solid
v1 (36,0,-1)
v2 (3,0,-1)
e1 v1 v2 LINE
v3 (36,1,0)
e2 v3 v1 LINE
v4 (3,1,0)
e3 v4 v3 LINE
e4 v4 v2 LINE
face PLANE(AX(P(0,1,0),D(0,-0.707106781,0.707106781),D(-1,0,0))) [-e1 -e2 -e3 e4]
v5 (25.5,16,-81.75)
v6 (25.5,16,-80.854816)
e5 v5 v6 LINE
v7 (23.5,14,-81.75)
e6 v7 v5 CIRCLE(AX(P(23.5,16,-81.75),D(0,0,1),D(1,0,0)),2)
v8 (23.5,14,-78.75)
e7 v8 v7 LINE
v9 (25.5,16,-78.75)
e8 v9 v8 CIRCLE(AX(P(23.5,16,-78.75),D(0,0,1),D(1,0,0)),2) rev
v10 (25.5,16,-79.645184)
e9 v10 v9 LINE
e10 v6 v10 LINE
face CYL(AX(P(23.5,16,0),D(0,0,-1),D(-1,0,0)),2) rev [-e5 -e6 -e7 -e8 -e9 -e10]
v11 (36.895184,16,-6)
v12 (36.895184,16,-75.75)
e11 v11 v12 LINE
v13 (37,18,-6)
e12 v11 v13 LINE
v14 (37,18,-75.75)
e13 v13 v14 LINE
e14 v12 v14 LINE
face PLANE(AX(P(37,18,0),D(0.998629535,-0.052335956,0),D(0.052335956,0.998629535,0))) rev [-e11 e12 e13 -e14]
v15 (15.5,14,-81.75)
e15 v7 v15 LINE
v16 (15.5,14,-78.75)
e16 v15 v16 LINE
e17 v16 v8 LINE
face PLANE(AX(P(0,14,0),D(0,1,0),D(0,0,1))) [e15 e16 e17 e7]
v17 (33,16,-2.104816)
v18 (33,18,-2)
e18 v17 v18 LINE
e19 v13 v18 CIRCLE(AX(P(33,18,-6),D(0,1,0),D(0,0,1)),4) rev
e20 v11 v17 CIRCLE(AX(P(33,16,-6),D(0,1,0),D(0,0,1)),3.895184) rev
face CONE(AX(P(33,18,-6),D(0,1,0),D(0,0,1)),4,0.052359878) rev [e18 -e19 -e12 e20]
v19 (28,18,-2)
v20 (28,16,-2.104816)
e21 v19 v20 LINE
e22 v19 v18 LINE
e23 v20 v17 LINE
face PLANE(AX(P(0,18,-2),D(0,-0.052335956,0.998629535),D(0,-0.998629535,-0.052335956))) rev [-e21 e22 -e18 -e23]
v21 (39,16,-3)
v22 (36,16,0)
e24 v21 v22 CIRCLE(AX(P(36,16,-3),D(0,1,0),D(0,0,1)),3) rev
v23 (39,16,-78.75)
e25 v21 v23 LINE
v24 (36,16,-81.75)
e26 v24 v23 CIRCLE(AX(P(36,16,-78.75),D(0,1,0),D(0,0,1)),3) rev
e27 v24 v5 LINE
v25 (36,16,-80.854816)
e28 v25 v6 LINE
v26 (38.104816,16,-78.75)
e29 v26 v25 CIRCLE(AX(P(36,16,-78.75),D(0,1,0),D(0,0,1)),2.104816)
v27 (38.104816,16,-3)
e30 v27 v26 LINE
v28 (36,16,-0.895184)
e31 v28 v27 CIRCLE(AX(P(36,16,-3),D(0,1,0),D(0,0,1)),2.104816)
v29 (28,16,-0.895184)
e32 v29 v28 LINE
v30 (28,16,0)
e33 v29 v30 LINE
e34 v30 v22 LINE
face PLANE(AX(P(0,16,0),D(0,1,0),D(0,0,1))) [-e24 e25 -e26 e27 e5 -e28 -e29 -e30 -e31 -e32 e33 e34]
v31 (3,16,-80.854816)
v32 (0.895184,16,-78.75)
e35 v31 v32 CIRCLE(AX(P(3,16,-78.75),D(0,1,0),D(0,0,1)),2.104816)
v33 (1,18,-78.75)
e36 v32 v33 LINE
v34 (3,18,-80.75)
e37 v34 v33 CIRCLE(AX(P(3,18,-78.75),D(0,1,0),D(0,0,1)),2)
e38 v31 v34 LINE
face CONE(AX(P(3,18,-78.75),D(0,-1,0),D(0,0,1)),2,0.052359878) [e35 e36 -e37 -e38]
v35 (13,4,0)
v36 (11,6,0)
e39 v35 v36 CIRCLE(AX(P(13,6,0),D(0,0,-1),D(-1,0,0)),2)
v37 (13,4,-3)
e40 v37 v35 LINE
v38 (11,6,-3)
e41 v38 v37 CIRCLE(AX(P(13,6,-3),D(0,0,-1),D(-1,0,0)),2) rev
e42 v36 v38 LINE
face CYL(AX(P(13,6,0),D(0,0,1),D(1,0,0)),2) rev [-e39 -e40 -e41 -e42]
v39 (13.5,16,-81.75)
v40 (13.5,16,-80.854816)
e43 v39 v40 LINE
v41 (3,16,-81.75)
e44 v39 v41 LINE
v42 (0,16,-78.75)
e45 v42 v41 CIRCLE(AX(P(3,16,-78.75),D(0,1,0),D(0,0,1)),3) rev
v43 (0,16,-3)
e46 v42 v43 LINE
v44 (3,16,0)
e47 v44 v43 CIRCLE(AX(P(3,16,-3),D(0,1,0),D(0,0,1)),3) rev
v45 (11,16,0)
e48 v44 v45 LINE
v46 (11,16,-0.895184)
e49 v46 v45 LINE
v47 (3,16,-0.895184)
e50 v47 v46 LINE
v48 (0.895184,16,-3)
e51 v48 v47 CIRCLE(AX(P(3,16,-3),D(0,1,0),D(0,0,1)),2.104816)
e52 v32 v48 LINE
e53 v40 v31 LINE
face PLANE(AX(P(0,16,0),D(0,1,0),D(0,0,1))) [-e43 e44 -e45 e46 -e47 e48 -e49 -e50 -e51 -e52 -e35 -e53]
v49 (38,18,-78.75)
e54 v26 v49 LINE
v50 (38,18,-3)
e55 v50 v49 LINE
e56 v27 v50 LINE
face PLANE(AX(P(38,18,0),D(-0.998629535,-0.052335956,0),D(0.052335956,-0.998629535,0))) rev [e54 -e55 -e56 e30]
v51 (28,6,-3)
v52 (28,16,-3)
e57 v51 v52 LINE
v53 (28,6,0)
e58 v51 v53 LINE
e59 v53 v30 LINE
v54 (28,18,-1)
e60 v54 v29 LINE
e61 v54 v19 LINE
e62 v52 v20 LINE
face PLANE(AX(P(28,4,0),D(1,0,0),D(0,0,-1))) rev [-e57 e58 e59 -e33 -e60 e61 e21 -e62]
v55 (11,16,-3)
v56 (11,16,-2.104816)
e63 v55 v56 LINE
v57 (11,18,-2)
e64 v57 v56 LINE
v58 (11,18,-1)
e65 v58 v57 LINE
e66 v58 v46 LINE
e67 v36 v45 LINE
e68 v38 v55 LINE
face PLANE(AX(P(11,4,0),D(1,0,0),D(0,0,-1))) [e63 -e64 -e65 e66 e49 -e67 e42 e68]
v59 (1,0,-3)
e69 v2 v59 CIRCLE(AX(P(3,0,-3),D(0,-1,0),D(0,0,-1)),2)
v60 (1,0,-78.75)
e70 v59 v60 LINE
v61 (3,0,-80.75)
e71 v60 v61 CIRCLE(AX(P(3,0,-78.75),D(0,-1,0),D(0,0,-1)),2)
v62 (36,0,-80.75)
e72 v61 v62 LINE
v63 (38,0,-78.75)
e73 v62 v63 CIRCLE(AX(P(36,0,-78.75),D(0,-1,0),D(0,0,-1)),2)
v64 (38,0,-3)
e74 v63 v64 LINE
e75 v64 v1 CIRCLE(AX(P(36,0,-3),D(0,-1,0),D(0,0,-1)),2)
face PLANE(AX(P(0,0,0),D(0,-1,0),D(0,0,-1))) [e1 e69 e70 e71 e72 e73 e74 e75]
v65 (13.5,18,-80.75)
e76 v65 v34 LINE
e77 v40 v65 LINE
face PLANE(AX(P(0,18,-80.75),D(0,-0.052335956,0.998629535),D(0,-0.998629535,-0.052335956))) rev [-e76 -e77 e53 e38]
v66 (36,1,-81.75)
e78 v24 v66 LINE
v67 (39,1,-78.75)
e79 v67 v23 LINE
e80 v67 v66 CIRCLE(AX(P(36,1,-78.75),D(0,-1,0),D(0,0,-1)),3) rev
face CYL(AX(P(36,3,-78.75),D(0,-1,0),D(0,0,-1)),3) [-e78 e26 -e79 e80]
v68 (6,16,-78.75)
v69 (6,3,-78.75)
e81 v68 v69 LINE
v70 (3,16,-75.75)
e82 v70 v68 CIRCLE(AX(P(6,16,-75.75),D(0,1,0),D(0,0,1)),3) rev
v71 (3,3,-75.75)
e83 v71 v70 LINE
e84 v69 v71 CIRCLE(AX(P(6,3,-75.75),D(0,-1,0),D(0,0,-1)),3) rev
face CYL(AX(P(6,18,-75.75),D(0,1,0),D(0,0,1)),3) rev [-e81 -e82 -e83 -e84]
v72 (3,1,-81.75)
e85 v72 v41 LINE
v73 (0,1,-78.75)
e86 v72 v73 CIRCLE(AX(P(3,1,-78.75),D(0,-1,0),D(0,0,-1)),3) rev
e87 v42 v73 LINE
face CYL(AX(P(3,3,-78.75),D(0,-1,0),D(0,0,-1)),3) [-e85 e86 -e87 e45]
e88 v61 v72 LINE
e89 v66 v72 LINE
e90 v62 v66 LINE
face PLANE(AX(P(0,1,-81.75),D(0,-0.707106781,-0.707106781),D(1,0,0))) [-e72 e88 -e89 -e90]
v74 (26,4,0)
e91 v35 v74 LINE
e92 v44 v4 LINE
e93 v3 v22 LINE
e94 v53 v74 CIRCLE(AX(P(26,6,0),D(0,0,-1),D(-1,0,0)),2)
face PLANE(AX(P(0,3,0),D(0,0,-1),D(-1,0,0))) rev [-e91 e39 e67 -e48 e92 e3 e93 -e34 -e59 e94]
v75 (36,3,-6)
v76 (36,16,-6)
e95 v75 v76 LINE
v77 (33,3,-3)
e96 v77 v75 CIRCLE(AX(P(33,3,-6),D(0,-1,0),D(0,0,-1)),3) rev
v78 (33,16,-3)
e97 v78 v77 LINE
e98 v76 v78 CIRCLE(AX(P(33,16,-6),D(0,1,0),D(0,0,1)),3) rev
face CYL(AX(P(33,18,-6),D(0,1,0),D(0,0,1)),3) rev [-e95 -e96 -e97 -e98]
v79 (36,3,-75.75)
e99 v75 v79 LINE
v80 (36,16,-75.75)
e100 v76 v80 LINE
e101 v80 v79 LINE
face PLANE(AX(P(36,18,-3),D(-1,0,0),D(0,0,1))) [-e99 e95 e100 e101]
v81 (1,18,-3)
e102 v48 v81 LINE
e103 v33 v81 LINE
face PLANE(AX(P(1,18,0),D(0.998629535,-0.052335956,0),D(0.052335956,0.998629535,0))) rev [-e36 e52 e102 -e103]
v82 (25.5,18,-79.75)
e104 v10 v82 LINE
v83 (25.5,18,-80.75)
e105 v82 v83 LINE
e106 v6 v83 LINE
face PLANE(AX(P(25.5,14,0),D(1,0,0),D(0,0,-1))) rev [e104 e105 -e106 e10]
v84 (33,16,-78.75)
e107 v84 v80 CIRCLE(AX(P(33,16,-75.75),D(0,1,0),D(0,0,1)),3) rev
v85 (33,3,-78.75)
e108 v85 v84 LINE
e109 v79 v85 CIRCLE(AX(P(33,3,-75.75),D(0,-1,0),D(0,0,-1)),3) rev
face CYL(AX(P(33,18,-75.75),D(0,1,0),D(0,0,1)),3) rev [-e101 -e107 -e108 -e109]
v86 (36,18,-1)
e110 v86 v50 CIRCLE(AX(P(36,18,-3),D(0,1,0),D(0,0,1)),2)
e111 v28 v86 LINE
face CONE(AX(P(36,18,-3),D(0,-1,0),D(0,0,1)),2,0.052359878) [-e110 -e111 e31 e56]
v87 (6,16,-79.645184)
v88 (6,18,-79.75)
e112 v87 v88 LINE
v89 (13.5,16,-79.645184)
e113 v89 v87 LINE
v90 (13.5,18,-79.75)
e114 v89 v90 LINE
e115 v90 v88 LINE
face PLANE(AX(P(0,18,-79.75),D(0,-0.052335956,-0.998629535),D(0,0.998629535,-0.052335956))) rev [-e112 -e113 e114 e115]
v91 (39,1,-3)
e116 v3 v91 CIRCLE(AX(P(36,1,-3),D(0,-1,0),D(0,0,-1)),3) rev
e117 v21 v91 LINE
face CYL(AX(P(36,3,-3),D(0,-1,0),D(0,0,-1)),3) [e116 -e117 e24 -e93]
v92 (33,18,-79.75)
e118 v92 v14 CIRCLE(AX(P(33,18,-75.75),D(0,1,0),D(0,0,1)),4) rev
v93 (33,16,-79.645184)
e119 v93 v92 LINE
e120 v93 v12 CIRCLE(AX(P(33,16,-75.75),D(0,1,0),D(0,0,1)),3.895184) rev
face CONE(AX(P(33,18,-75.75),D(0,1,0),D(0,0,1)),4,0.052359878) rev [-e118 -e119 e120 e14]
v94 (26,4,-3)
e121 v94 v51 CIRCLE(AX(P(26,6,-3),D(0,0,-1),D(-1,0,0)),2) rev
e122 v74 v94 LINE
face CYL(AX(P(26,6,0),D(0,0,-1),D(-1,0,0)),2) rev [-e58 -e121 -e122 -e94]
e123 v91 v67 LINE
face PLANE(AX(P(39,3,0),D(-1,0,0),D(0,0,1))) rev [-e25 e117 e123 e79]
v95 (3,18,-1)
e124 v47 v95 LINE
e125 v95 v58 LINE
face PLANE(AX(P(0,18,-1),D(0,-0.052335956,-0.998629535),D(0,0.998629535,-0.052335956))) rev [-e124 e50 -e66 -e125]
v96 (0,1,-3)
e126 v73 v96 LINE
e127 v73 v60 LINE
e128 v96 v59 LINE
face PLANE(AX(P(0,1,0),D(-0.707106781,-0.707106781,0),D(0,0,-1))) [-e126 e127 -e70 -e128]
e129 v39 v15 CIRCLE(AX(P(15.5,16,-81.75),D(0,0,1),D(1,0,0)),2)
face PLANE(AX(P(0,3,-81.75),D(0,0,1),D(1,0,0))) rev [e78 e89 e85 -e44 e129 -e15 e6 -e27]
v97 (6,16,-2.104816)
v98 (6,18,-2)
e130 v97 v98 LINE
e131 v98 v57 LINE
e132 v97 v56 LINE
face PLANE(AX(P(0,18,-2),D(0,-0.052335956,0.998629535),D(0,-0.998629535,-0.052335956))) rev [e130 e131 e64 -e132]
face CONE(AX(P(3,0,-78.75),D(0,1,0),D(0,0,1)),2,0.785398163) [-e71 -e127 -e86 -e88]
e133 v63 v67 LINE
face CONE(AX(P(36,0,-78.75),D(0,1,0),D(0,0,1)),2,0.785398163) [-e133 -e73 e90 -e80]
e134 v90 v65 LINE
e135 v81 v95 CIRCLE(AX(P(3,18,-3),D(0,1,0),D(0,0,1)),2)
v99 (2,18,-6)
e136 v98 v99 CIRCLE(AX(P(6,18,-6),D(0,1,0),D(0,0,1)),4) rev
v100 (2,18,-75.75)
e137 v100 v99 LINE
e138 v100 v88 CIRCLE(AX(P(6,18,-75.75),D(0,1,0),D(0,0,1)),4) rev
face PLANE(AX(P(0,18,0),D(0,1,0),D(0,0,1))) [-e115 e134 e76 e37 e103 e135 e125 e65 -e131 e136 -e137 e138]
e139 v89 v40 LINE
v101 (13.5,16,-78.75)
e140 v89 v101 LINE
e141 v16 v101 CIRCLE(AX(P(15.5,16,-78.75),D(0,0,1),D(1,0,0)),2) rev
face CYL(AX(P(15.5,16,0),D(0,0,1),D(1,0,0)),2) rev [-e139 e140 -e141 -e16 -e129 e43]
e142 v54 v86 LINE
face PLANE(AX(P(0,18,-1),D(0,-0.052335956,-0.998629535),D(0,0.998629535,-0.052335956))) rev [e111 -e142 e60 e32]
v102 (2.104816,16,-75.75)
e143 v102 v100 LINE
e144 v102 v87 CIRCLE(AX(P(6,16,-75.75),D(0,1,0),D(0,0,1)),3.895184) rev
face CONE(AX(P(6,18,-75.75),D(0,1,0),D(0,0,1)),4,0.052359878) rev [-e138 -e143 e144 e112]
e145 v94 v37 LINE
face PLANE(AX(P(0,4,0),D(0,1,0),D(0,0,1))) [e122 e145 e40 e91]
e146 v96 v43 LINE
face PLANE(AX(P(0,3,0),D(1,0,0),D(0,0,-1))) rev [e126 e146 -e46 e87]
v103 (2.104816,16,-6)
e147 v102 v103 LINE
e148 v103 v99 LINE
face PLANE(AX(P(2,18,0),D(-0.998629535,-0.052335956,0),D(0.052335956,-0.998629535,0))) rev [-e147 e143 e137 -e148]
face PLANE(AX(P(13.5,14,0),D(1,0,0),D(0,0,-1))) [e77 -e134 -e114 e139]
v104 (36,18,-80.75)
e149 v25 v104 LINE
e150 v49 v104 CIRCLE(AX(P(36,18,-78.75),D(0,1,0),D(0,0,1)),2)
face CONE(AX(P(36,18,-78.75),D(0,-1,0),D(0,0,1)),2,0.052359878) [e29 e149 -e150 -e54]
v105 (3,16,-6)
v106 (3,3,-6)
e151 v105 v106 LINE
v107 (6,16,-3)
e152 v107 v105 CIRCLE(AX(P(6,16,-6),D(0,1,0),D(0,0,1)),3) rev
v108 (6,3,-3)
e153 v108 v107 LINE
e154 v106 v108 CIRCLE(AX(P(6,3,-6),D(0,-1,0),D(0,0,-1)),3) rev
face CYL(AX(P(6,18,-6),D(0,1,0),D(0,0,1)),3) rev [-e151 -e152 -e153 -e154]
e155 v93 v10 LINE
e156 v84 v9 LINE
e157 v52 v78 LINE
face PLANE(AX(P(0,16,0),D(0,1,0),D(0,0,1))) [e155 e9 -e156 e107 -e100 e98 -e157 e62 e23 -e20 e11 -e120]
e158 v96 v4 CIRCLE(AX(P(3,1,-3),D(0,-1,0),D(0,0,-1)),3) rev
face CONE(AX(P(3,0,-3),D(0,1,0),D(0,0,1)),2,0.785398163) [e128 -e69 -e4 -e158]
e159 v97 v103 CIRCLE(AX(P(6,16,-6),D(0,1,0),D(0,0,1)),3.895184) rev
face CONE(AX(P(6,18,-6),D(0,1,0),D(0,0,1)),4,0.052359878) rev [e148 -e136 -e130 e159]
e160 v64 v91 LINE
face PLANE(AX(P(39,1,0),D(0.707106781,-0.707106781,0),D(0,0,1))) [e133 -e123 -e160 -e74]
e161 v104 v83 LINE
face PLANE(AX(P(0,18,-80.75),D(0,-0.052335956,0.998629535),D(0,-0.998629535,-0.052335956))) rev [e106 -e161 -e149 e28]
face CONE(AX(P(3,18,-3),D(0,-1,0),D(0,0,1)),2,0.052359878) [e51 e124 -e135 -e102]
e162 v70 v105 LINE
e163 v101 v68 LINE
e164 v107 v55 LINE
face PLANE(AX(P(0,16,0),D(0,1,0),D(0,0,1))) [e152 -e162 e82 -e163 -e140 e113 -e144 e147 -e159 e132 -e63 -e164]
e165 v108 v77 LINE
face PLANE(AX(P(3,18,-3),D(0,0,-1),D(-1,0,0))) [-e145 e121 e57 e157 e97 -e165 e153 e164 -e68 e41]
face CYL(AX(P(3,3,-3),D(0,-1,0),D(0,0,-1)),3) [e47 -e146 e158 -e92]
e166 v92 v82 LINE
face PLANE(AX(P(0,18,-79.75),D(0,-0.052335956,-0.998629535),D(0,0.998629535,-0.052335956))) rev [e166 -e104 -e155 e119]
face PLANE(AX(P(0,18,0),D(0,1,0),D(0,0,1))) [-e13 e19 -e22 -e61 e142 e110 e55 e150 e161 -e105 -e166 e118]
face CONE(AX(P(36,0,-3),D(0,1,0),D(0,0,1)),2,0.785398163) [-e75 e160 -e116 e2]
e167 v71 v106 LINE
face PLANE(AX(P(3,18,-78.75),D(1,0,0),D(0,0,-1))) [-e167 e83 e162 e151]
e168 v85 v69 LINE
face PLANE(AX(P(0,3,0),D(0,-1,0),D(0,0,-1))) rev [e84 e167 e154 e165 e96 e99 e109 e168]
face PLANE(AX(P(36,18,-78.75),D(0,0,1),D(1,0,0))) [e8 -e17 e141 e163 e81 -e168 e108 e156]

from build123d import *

# Parameters (mm, degrees)
SKETCH1_W                 = 39
SKETCH1_H                 = 81.75
BOSS_EXTRUDE1_DEPTH       = 3
SKETCH2_W                 = 39
SKETCH2_H                 = 81.75
SKETCH2_W_2               = 33
SKETCH2_H_2               = 75.75
BOSS_EXTRUDE2_DEPTH       = 15
SKETCH4_W                 = 17
SKETCH4_H                 = 3
CUT_EXTRUDE1_DEPTH        = 14
SKETCH4_3_W               = 12
SKETCH4_3_H               = 3
CUT_EXTRUDE2_DEPTH        = 4
FILLET1_R                 = 3
STANDOFFS1_GROOVE_DEPTH   = 2
STANDOFFS1_GROOVE_DRAFT   = -3
STANDOFFS1_GROOVE_2_DEPTH = 2
STANDOFFS1_GROOVE_2_DRAFT = -3
STANDOFFS2_GROOVE_DEPTH   = 2
STANDOFFS2_GROOVE_DRAFT   = -3
STANDOFFS2_GROOVE_2_DEPTH = 2
STANDOFFS2_GROOVE_2_DRAFT = -3
FILLET2_R                 = 2
CHAMFER1_SIZE             = 1


# Read off the part's stored shape, not the designer's step: Standoffs1-Groove, Standoffs2-Groove
with BuildPart() as part:
    # Sketch1 → Boss-Extrude1 (new body)
    with BuildSketch(Plane(origin=(0, 0, 0), x_dir=(1, 0, 0), z_dir=(0, 1, 0))):
        with Locations((19.5, 40.875)):
            Rectangle(SKETCH1_W, SKETCH1_H)
    extrude(amount=BOSS_EXTRUDE1_DEPTH)

    # Sketch2 → Boss-Extrude2 (add)
    with BuildSketch(Plane(origin=(0, 3, 0), x_dir=(1, 0, 0), z_dir=(0, 1, 0))):
        with Locations((19.5, 40.875)):
            Rectangle(SKETCH2_W, SKETCH2_H)
        with Locations((19.5, 40.875)):
            Rectangle(SKETCH2_W_2, SKETCH2_H_2, mode=Mode.SUBTRACT)
    extrude(amount=BOSS_EXTRUDE2_DEPTH)

    # Sketch4 → Cut-Extrude1 (cut)
    with BuildSketch(Plane(origin=(0, 18, 0), x_dir=(1, 0, 0), z_dir=(0, 1, 0))):
        with Locations((19.5, 1.5)):
            Rectangle(SKETCH4_W, SKETCH4_H)
    extrude(amount=-CUT_EXTRUDE1_DEPTH, mode=Mode.SUBTRACT)

    # Sketch4<3> → Cut-Extrude2 (cut)
    with BuildSketch(Plane(origin=(0, 18, 0), x_dir=(1, 0, 0), z_dir=(0, 1, 0))):
        with Locations((19.5, 80.25)):
            Rectangle(SKETCH4_3_W, SKETCH4_3_H)
    extrude(amount=-CUT_EXTRUDE2_DEPTH, mode=Mode.SUBTRACT)

    # Fillet1
    fillet1_edges = [part.edges().sort_by_distance(p)[0] for p in [
        (3, 10.5, -78.75),
        (3, 10.5, -3),
        (36, 10.5, -3),
        (36, 10.5, -78.75),
        (0, 9, -81.75),
        (39, 9, -81.75),
        (39, 9, 0),
        (0, 9, 0),
    ]]
    fillet(fillet1_edges, radius=FILLET1_R)


with BuildPart() as standoffs1_groove_tool:
    # Standoffs1-Groove outline → Standoffs1-Groove (with draft: the straight prism first)
    with BuildSketch(Plane(origin=(0, 16, 0), x_dir=(1, 0, 0), z_dir=(0, 1, 0))):
        with BuildLine():
            Line((11, 0.895184441), (3, 0.895184441))
            ThreePointArc((3, 0.895184441), (1.511670645, 1.511670645), (0.895184441, 3))
            Line((0.895184441, 3), (0.895184441, 78.75))
            ThreePointArc((0.895184441, 78.75), (1.511670645, 80.238329355), (3, 80.854815559))
            Line((3, 80.854815559), (13.5, 80.854815559))
            Line((13.5, 80.854815559), (13.5, 81.75))
            Line((13.5, 81.75), (3, 81.75))
            ThreePointArc((3, 81.75), (0.878679656, 80.871320344), (0, 78.75))
            Line((0, 78.75), (0, 3))
            ThreePointArc((0, 3), (0.878679656, 0.878679656), (3, 0))
            Line((3, 0), (11, 0))
            Line((11, 0), (11, 0.895184441))
        make_face()
    extrude(amount=STANDOFFS1_GROOVE_DEPTH)
    # Standoffs1-Groove: the draft: its side faces are tilted about the plane it starts from
    standoffs1_groove_sides = [standoffs1_groove_tool.faces().sort_by_distance(p)[0] for p in [
        (7, 17, -0.895184441),
        (1.511670645, 17, -1.511670645),
        (0.895184441, 17, -40.875),
        (1.511670645, 17, -80.238329355),
        (8.25, 17, -80.854815559),
        (13.5, 17, -81.30240778),
        (8.25, 17, -81.75),
        (0.878679656, 17, -80.871320344),
        (0, 17, -40.875),
        (0.878679656, 17, -0.878679656),
        (7, 17, 0),
        (11, 17, -0.447592221),
    ]]
    draft(standoffs1_groove_sides, Plane(origin=(0, 16, 0), x_dir=(1, 0, 0), z_dir=(0, 1, 0)), STANDOFFS1_GROOVE_DRAFT)


with BuildPart() as part_1:
    add(part.part)

    # Standoffs1-Groove: cut by standoffs1_groove_tool
    add(standoffs1_groove_tool.part, mode=Mode.SUBTRACT)


with BuildPart() as standoffs1_groove_2_tool:
    # Standoffs1-Groove 2 outline → Standoffs1-Groove 2 (with draft: the straight prism first)
    with BuildSketch(Plane(origin=(0, 16, 0), x_dir=(1, 0, 0), z_dir=(0, 1, 0))):
        with BuildLine():
            Line((11, 3), (6, 3))
            ThreePointArc((6, 3), (3.878679656, 3.878679656), (3, 6))
            Line((3, 6), (3, 75.75))
            ThreePointArc((3, 75.75), (3.878679656, 77.871320344), (6, 78.75))
            Line((6, 78.75), (13.5, 78.75))
            Line((13.5, 78.75), (13.5, 79.645184441))
            Line((13.5, 79.645184441), (6, 79.645184441))
            ThreePointArc((6, 79.645184441), (3.245688667, 78.504311333), (2.104815559, 75.75))
            Line((2.104815559, 75.75), (2.104815559, 6))
            ThreePointArc((2.104815559, 6), (3.245688667, 3.245688667), (6, 2.104815559))
            Line((6, 2.104815559), (11, 2.104815559))
            Line((11, 2.104815559), (11, 3))
        make_face()
    extrude(amount=STANDOFFS1_GROOVE_2_DEPTH)
    # Standoffs1-Groove 2: the draft: its side faces are tilted about the plane it starts from
    standoffs1_groove_2_sides = [standoffs1_groove_2_tool.faces().sort_by_distance(p)[0] for p in [
        (3.245688667, 17, -78.504311333),
        (2.104815559, 17, -40.875),
        (3.245688667, 17, -3.245688667),
        (8.5, 17, -2.104815559),
        (11, 17, -2.552407779),
        (8.5, 17, -3),
        (3.878679656, 17, -3.878679656),
        (3, 17, -40.875),
        (3.878679656, 17, -77.871320344),
        (9.75, 17, -78.75),
        (13.5, 17, -79.19759222),
        (9.75, 17, -79.645184441),
    ]]
    draft(standoffs1_groove_2_sides, Plane(origin=(0, 16, 0), x_dir=(1, 0, 0), z_dir=(0, 1, 0)), STANDOFFS1_GROOVE_2_DRAFT)


with BuildPart() as part_2:
    add(part_1.part)

    # Standoffs1-Groove 2: cut by standoffs1_groove_2_tool
    add(standoffs1_groove_2_tool.part, mode=Mode.SUBTRACT)


with BuildPart() as standoffs2_groove_tool:
    # Standoffs2-Groove outline → Standoffs2-Groove (with draft: the straight prism first)
    with BuildSketch(Plane(origin=(0, 16, 0), x_dir=(1, 0, 0), z_dir=(0, 1, 0))):
        with BuildLine():
            Line((25.5, 81.75), (25.5, 80.854815559))
            Line((25.5, 80.854815559), (36, 80.854815559))
            ThreePointArc((36, 80.854815559), (37.488329355, 80.238329355), (38.104815559, 78.75))
            Line((38.104815559, 78.75), (38.104815559, 3))
            ThreePointArc((38.104815559, 3), (37.488329355, 1.511670645), (36, 0.895184441))
            Line((36, 0.895184441), (28, 0.895184441))
            Line((28, 0.895184441), (28, 0))
            Line((28, 0), (36, 0))
            ThreePointArc((36, 0), (38.121320344, 0.878679656), (39, 3))
            Line((39, 3), (39, 78.75))
            ThreePointArc((39, 78.75), (38.121320344, 80.871320344), (36, 81.75))
            Line((36, 81.75), (25.5, 81.75))
        make_face()
    extrude(amount=STANDOFFS2_GROOVE_DEPTH)
    # Standoffs2-Groove: the draft: its side faces are tilted about the plane it starts from
    standoffs2_groove_sides = [standoffs2_groove_tool.faces().sort_by_distance(p)[0] for p in [
        (25.5, 17, -81.30240778),
        (30.75, 17, -80.854815559),
        (37.488329355, 17, -80.238329355),
        (38.104815559, 17, -40.875),
        (37.488329355, 17, -1.511670645),
        (32, 17, -0.895184441),
        (28, 17, -0.447592221),
        (32, 17, 0),
        (38.121320344, 17, -0.878679656),
        (39, 17, -40.875),
        (38.121320344, 17, -80.871320344),
        (30.75, 17, -81.75),
    ]]
    draft(standoffs2_groove_sides, Plane(origin=(0, 16, 0), x_dir=(1, 0, 0), z_dir=(0, 1, 0)), STANDOFFS2_GROOVE_DRAFT)


with BuildPart() as part_3:
    add(part_2.part)

    # Standoffs2-Groove: cut by standoffs2_groove_tool
    add(standoffs2_groove_tool.part, mode=Mode.SUBTRACT)


with BuildPart() as standoffs2_groove_2_tool:
    # Standoffs2-Groove 2 outline → Standoffs2-Groove 2 (with draft: the straight prism first)
    with BuildSketch(Plane(origin=(0, 16, 0), x_dir=(1, 0, 0), z_dir=(0, 1, 0))):
        with BuildLine():
            Line((28, 3), (28, 2.104815559))
            Line((28, 2.104815559), (33, 2.104815559))
            ThreePointArc((33, 2.104815559), (35.754311333, 3.245688667), (36.895184441, 6))
            Line((36.895184441, 6), (36.895184441, 75.75))
            ThreePointArc((36.895184441, 75.75), (35.754311333, 78.504311333), (33, 79.645184441))
            Line((33, 79.645184441), (25.5, 79.645184441))
            Line((25.5, 79.645184441), (25.5, 78.75))
            Line((25.5, 78.75), (33, 78.75))
            ThreePointArc((33, 78.75), (35.121320344, 77.871320344), (36, 75.75))
            Line((36, 75.75), (36, 6))
            ThreePointArc((36, 6), (35.121320344, 3.878679656), (33, 3))
            Line((33, 3), (28, 3))
        make_face()
    extrude(amount=STANDOFFS2_GROOVE_2_DEPTH)
    # Standoffs2-Groove 2: the draft: its side faces are tilted about the plane it starts from
    standoffs2_groove_2_sides = [standoffs2_groove_2_tool.faces().sort_by_distance(p)[0] for p in [
        (30.5, 17, -3),
        (28, 17, -2.552407779),
        (30.5, 17, -2.104815559),
        (35.754311333, 17, -3.245688667),
        (36.895184441, 17, -40.875),
        (35.754311333, 17, -78.504311333),
        (29.25, 17, -79.645184441),
        (25.5, 17, -79.19759222),
        (29.25, 17, -78.75),
        (35.121320344, 17, -77.871320344),
        (36, 17, -40.875),
        (35.121320344, 17, -3.878679656),
    ]]
    draft(standoffs2_groove_2_sides, Plane(origin=(0, 16, 0), x_dir=(1, 0, 0), z_dir=(0, 1, 0)), STANDOFFS2_GROOVE_2_DRAFT)


with BuildPart() as part_4:
    add(part_3.part)

    # Standoffs2-Groove 2: cut by standoffs2_groove_2_tool
    add(standoffs2_groove_2_tool.part, mode=Mode.SUBTRACT)

    # Fillet2
    fillet2_edges = [part_4.edges().sort_by_distance(p)[0] for p in [
        (25.5, 14, -80.25),
        (13.5, 14, -80.25),
        (11, 4, -1.5),
        (28, 4, -1.5),
    ]]
    fillet(fillet2_edges, radius=FILLET2_R - 0.0001)  # a hair under: the kernel refuses the full size

    # Chamfer1
    chamfer1_edges = [part_4.edges().sort_by_distance(p)[0] for p in [
        (19.5, 0, 0),
        (0, 0, -40.875),
        (19.5, 0, -81.75),
        (39, 0, -40.875),
        (38.121320344, 0, -0.878679656),
        (0.878679656, 0, -80.871320344),
        (38.121320344, 0, -80.871320344),
        (0.878679656, 0, -0.878679656),
    ]]
    chamfer(chamfer1_edges, length=CHAMFER1_SIZE)


solid = part_4.part
